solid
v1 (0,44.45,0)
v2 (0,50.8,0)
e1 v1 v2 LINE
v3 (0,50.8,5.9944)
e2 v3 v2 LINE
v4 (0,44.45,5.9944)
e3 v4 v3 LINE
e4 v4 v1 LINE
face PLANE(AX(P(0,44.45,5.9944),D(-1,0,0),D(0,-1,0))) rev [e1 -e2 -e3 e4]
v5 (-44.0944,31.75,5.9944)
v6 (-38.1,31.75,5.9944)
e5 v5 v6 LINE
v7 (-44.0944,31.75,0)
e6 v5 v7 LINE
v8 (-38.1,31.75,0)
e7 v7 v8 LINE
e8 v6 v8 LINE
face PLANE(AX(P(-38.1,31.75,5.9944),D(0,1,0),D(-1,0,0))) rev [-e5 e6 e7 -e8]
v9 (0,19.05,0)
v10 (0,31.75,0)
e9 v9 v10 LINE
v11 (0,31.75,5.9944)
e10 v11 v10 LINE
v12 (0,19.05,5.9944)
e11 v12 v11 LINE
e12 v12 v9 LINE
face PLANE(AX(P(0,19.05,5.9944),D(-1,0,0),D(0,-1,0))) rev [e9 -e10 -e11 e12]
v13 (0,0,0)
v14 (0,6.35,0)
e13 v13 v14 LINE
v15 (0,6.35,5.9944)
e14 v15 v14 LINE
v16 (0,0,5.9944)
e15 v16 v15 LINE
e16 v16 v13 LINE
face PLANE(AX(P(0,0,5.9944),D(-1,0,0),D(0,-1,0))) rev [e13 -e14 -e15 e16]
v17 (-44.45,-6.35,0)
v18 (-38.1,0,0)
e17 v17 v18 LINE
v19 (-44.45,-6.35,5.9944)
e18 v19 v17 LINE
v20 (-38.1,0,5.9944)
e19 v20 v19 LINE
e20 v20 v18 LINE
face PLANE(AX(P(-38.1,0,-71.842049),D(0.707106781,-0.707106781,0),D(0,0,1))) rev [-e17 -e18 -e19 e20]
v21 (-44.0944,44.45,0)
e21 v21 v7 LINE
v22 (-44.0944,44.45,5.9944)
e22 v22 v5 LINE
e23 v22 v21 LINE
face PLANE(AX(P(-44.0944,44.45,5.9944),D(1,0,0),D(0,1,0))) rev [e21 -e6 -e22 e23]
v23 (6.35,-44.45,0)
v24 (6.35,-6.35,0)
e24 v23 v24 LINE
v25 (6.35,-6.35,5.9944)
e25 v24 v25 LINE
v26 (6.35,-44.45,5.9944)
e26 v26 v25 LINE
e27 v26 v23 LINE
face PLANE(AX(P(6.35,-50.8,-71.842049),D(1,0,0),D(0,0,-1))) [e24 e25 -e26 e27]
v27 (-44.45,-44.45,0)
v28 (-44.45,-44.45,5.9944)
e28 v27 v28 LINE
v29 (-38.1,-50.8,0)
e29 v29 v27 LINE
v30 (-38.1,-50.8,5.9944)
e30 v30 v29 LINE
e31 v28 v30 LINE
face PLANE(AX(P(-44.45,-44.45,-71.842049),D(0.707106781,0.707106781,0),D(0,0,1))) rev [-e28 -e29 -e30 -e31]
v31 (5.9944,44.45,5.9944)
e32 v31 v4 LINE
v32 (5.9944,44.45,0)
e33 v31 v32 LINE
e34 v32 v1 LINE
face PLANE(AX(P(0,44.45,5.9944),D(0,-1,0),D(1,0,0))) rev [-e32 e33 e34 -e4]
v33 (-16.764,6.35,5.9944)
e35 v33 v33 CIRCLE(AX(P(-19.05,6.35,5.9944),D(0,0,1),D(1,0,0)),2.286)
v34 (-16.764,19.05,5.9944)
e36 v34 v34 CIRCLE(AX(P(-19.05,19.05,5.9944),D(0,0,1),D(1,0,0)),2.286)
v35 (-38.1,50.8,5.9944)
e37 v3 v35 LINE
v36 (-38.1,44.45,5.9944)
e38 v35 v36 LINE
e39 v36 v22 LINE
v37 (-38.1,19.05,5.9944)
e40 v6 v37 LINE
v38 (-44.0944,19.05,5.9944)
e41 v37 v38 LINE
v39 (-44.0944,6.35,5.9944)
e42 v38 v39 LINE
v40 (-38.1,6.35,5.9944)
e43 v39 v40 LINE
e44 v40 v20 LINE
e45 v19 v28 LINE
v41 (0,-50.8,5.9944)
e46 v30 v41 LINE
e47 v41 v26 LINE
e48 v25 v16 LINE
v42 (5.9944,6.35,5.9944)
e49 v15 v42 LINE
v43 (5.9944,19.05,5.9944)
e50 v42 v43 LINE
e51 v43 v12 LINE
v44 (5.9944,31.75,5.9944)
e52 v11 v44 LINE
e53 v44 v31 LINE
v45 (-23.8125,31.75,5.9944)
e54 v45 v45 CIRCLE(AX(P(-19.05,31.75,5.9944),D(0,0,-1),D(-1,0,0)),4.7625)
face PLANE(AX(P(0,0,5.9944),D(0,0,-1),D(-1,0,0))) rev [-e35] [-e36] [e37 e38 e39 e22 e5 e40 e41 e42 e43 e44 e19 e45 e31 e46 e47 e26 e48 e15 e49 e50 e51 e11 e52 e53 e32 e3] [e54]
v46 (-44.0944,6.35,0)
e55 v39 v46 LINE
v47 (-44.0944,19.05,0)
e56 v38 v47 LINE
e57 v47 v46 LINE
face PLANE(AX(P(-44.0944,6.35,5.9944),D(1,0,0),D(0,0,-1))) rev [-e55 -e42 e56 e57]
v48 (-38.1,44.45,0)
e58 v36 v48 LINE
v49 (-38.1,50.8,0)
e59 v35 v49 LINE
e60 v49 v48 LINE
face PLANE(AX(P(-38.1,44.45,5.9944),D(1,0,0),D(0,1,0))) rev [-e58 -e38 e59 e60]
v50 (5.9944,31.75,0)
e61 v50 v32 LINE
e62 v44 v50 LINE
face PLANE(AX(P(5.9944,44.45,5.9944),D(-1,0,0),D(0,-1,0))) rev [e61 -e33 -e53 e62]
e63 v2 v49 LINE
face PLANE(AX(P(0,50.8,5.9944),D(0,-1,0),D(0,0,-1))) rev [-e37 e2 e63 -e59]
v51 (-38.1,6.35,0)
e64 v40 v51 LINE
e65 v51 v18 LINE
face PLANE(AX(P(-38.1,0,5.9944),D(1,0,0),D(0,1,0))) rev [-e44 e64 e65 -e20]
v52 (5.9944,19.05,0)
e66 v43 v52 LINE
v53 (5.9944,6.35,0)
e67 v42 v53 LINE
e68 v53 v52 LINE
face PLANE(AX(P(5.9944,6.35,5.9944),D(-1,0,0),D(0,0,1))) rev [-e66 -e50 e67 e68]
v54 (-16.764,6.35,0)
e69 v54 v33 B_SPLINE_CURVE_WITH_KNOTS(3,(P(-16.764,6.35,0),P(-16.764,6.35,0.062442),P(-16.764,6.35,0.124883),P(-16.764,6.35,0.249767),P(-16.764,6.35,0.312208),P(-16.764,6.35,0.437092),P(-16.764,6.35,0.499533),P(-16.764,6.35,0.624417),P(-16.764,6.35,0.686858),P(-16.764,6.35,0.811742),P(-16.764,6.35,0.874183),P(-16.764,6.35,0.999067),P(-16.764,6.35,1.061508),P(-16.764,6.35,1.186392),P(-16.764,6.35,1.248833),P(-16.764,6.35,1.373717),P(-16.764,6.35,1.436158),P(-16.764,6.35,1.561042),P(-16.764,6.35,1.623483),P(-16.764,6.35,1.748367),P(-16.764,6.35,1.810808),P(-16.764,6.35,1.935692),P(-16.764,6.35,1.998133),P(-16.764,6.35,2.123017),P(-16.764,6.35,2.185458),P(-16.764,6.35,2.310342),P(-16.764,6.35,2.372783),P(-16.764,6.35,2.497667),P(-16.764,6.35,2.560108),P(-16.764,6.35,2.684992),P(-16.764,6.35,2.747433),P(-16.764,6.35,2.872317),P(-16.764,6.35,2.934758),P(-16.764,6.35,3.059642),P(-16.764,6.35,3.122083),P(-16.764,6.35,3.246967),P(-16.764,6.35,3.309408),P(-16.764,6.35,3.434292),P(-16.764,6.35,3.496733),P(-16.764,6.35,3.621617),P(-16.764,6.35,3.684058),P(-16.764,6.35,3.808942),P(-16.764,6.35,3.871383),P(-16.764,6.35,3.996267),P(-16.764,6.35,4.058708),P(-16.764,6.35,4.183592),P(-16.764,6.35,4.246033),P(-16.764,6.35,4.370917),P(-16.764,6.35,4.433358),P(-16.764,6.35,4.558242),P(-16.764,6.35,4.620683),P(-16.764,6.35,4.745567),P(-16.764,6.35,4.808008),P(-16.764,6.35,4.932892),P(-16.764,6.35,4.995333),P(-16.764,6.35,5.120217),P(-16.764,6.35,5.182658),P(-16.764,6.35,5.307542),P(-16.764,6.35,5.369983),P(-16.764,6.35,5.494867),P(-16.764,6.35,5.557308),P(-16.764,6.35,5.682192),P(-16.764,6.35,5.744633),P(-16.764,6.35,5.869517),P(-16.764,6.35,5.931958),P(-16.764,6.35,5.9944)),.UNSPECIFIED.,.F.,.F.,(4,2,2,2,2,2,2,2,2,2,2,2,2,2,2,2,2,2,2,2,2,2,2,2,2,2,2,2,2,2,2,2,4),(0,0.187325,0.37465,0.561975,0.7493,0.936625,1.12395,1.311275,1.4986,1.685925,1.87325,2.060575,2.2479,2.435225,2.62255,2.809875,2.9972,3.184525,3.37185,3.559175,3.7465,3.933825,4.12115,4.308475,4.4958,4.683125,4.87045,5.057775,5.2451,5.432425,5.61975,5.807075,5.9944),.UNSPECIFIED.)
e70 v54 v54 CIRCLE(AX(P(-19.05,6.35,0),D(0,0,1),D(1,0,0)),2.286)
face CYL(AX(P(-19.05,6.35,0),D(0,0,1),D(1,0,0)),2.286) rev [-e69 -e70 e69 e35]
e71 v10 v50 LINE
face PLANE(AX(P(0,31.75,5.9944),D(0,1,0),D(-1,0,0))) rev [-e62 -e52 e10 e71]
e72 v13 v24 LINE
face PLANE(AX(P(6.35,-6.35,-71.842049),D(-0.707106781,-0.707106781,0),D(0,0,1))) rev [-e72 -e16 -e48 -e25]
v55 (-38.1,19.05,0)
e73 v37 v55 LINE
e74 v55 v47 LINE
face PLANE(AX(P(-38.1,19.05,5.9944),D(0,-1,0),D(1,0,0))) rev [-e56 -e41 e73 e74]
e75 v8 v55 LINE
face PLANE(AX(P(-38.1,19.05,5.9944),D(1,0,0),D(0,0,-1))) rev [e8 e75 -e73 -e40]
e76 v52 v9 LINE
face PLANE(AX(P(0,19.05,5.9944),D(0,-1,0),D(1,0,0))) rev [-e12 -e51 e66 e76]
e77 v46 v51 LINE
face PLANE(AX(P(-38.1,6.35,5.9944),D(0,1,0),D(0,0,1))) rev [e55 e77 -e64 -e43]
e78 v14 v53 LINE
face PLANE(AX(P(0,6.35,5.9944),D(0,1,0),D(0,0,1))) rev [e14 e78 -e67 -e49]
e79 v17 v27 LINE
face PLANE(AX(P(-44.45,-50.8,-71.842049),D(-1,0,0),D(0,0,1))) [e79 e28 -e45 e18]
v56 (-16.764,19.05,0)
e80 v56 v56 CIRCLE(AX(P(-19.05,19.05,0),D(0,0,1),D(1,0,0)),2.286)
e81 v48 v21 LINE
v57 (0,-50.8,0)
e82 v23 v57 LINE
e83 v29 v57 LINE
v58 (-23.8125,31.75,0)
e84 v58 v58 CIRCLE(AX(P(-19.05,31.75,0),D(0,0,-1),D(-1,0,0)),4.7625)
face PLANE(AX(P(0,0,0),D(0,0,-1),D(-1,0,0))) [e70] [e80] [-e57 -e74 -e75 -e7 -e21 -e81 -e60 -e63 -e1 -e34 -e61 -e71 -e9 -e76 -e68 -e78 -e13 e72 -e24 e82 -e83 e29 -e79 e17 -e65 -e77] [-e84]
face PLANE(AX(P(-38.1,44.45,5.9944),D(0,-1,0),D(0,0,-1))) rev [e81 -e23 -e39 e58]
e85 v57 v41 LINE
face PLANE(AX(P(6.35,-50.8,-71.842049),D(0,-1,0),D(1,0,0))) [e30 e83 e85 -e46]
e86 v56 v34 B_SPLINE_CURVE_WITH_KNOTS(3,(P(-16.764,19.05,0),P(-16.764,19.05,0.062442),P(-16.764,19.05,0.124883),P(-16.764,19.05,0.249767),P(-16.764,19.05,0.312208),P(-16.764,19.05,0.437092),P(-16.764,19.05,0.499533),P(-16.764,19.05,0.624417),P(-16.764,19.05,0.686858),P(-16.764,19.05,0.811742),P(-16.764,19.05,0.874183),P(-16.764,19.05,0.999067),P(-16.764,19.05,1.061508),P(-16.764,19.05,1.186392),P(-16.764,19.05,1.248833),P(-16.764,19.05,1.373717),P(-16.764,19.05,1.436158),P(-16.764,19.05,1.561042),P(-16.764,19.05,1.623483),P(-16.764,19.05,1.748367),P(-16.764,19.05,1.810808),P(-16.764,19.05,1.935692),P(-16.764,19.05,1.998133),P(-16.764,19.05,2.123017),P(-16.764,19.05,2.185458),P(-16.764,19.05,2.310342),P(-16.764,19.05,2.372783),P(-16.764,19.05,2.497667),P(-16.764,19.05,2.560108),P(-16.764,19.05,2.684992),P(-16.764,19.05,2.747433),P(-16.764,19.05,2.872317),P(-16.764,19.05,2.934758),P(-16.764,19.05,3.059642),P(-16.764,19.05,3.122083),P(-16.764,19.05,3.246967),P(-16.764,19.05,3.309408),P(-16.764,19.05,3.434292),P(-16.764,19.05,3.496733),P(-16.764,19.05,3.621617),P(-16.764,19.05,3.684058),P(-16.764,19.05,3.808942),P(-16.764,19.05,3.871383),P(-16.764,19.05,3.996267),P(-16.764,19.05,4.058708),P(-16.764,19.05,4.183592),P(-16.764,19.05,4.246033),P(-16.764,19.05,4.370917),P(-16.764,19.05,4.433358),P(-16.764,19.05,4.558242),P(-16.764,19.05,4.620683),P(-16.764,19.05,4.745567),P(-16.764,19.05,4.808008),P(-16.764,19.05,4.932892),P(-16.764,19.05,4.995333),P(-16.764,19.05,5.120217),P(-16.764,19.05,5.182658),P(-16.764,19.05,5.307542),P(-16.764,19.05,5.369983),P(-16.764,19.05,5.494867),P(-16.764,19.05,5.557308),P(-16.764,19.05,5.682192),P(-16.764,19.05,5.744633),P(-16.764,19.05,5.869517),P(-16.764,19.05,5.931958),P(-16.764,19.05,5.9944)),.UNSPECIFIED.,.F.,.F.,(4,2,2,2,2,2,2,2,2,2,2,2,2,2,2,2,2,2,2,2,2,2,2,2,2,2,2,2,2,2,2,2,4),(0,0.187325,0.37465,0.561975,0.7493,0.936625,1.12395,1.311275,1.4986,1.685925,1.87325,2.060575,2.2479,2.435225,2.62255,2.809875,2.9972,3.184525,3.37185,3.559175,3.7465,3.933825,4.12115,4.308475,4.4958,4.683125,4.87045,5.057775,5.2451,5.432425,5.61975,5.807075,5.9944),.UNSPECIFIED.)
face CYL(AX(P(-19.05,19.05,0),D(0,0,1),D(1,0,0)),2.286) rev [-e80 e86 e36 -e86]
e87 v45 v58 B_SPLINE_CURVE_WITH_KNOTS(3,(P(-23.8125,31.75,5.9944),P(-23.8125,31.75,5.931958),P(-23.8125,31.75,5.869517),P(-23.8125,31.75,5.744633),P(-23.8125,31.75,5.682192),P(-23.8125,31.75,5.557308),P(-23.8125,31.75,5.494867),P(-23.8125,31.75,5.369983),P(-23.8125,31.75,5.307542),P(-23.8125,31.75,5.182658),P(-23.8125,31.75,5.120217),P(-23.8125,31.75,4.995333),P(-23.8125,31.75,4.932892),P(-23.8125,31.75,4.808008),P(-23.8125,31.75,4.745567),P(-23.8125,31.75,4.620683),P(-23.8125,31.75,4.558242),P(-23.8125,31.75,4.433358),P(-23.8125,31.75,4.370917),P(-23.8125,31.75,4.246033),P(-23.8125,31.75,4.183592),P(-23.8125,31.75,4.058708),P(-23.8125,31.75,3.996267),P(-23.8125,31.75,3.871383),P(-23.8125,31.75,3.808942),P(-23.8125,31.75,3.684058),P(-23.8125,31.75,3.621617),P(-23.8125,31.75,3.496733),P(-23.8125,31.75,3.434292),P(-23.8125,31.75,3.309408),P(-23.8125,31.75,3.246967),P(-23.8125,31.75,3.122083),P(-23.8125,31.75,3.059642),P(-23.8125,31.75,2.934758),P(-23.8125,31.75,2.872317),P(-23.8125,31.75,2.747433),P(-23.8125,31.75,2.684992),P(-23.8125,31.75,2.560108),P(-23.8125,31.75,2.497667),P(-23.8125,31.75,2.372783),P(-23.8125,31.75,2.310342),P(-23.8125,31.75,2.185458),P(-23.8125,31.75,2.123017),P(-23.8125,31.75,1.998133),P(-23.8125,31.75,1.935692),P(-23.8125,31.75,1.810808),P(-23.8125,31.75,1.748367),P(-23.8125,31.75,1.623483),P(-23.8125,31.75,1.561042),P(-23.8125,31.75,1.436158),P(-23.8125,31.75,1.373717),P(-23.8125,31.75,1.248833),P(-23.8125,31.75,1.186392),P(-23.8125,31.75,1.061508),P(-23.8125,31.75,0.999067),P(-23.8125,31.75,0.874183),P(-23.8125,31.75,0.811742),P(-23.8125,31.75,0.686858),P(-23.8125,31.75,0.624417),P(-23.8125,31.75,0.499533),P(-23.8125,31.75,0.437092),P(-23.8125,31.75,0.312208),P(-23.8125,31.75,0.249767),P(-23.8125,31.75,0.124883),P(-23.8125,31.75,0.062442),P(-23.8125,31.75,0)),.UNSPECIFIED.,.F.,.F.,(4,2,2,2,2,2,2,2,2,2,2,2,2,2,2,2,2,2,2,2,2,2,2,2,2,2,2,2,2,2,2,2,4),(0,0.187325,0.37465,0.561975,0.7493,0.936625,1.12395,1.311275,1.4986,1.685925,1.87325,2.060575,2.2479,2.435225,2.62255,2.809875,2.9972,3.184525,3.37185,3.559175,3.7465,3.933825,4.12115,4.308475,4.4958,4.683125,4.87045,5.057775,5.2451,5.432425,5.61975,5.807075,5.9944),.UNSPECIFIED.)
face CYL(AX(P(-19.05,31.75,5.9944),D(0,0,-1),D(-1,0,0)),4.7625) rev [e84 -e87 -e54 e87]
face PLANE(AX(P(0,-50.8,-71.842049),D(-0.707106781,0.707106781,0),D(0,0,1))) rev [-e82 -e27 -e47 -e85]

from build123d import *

# Parameters (mm, degrees)
BOSS_EXTRUDE1_DEPTH = 5.9944
SKETCH2_R           = 4.7625
CUT_EXTRUDE1_DEPTH  = 68.534353797
SKETCH3_R           = 2.286
CUT_EXTRUDE2_DEPTH  = 68.534353797
SKETCH4_W           = 50.8
SKETCH4_H           = 50.8
BOSS_EXTRUDE2_DEPTH = 5.9944
CHAMFER1_SIZE       = 6.35


with BuildPart() as part:
    # Sketch1 → Boss-Extrude1 (new body)
    with BuildSketch(Plane.XY):
        Polygon((0, 0), (-38.1, 0), (-38.1, 6.35), (-44.0944, 6.35), (-44.0944, 19.05), (-38.1, 19.05), (-38.1, 31.75), (-44.0944, 31.75), (-44.0944, 44.45), (-38.1, 44.45), (-38.1, 50.8), (0, 50.8), (0, 44.45), (5.9944, 44.45), (5.9944, 31.75), (0, 31.75), (0, 19.05), (5.9944, 19.05), (5.9944, 6.35), (0, 6.35), align=None)
    extrude(amount=BOSS_EXTRUDE1_DEPTH)

    # Sketch2 → Cut-Extrude1 (cut, through all)
    with BuildSketch(Plane(origin=(0, 0, 0), x_dir=(-1, 0, 0), z_dir=(0, 0, -1))):
        with Locations((19.05, 31.75)):
            Circle(SKETCH2_R)
    extrude(amount=-CUT_EXTRUDE1_DEPTH, mode=Mode.SUBTRACT)

    # Sketch3 → Cut-Extrude2 (cut, through all)
    with BuildSketch(Plane.XY.offset(5.9944)):
        with Locations((-19.05, 19.05)):
            Circle(SKETCH3_R)
        with Locations((-19.05, 6.35)):
            Circle(SKETCH3_R)
    extrude(amount=-CUT_EXTRUDE2_DEPTH, mode=Mode.SUBTRACT)

    # Sketch4 → Boss-Extrude2 (add)
    with BuildSketch(Plane.XY.offset(5.9944)):
        with Locations((-19.05, -25.4)):
            Rectangle(SKETCH4_W, SKETCH4_H)
    extrude(amount=-BOSS_EXTRUDE2_DEPTH)

    # Chamfer1
    chamfer1_edges = [part.edges().sort_by_distance(p)[0] for p in [
        (6.35, 0, 2.9972),
        (6.35, -50.8, 2.9972),
        (-44.45, -50.8, 2.9972),
        (-44.45, 0, 2.9972),
    ]]
    chamfer(chamfer1_edges, length=CHAMFER1_SIZE - 0.0001)  # a hair under: the kernel refuses the full size


solid = part.part
